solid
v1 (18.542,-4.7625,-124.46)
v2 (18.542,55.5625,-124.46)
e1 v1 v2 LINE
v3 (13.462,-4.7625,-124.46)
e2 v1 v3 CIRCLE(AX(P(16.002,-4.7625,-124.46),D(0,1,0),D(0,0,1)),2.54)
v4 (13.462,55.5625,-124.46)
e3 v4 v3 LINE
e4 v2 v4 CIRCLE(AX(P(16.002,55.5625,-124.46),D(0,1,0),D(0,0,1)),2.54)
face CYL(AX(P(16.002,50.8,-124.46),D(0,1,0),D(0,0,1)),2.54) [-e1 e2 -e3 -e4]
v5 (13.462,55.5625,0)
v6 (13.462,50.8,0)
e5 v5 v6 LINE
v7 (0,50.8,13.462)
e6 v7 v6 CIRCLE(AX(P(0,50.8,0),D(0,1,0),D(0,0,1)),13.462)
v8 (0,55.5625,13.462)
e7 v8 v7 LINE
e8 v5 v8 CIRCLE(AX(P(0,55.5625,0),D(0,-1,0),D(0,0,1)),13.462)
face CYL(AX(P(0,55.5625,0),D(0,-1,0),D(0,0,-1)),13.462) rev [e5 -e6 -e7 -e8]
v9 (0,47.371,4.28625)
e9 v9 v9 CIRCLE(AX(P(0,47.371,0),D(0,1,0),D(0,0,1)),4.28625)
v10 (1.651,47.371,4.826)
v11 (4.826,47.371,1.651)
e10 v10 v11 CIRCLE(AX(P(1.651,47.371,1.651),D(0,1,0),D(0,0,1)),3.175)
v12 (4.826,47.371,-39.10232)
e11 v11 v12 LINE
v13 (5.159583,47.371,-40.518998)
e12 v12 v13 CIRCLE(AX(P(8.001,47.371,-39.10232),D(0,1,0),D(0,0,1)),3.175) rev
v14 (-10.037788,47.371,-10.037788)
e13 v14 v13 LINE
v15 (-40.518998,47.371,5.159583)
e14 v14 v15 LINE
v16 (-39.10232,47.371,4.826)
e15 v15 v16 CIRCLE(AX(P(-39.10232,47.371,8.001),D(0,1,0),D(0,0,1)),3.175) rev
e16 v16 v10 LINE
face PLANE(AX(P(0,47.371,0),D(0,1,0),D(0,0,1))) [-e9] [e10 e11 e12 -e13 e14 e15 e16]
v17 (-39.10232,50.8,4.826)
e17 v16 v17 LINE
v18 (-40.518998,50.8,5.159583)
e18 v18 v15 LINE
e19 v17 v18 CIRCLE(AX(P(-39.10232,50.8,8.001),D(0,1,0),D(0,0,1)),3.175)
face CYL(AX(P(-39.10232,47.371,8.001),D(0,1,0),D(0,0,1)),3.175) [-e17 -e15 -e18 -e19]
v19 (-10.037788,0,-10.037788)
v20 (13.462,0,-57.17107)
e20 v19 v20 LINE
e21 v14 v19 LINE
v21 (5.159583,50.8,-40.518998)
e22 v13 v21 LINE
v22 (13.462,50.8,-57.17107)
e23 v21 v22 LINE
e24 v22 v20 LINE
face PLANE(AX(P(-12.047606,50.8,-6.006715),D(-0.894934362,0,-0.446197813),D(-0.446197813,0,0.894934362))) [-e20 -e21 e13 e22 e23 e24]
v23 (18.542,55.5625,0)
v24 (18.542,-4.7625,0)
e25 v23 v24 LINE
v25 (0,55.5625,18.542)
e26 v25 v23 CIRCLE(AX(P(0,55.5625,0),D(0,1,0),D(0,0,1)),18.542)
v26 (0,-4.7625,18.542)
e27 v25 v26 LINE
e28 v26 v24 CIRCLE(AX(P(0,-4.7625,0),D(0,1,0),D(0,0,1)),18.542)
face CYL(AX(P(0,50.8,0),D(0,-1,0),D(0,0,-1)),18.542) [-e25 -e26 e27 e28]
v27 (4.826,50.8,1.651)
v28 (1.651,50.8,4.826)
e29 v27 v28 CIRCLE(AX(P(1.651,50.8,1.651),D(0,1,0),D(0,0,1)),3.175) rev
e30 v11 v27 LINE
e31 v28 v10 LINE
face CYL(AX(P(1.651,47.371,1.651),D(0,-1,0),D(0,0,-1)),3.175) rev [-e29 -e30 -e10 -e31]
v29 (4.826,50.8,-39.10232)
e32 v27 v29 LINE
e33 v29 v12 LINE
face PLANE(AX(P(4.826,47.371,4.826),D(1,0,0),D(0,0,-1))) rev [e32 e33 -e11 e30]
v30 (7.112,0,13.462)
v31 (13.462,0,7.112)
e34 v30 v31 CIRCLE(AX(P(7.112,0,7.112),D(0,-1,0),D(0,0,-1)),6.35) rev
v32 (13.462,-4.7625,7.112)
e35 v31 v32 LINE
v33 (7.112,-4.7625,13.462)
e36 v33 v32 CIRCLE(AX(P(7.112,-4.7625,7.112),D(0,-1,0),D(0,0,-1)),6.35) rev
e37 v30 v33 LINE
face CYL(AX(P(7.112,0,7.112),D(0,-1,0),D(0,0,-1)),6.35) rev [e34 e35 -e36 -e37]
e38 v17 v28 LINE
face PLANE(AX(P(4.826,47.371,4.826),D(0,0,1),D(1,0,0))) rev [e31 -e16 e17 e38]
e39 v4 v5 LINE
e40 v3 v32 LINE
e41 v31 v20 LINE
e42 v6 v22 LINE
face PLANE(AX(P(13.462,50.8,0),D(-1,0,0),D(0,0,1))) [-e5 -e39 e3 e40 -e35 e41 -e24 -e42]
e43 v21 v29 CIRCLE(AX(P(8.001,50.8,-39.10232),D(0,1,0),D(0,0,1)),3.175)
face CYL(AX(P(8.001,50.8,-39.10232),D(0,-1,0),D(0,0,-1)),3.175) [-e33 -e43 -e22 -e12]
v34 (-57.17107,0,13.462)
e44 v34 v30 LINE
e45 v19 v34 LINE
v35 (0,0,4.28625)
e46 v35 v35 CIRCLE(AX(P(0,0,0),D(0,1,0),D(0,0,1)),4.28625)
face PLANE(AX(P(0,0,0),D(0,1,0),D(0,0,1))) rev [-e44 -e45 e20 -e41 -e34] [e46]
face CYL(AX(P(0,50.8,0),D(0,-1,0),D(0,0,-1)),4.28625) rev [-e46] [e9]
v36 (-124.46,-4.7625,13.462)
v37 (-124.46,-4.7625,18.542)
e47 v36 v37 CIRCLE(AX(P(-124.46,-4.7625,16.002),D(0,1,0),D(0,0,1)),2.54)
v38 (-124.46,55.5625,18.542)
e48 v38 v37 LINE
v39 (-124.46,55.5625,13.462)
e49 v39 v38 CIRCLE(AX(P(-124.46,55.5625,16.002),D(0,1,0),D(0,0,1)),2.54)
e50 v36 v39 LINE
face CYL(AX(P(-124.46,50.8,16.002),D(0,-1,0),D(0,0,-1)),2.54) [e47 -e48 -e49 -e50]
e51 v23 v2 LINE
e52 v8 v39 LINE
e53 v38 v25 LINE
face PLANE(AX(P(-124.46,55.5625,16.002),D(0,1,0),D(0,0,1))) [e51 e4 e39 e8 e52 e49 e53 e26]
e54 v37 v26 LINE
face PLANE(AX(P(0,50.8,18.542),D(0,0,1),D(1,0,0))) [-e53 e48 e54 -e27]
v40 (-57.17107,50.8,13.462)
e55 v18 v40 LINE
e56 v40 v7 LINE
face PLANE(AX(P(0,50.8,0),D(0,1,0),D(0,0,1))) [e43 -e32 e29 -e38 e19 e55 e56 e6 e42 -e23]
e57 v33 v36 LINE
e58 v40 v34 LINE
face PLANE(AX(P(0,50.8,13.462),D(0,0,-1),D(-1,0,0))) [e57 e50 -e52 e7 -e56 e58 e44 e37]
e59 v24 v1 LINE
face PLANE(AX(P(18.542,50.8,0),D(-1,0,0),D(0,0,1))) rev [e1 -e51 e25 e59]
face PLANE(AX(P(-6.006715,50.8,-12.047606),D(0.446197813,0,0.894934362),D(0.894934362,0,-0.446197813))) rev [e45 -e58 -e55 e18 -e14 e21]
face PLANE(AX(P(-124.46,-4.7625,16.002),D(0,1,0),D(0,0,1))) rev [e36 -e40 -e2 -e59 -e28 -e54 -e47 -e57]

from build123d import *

# Parameters (mm, degrees)
SKETCH1_R           = 4.28625
BOSS_EXTRUDE1_DEPTH = 50.8
FILLET2_R           = 2.54
SKETCH7_W           = 44.675933609
SKETCH7_H           = 44.675933609
CUT_EXTRUDE3_DEPTH  = 3.429
FILLET9_R           = 3.175
BOSS_EXTRUDE2_DEPTH = 30.1625
CUT_EXTRUDE4_START  = -4.7625
CUT_EXTRUDE4_DEPTH  = 4.7625


with BuildPart() as part:
    # Sketch1 → Boss-Extrude1 (new body)
    with BuildSketch(Plane(origin=(0, 0, 0), x_dir=(1, 0, 0), z_dir=(0, 1, 0))):
        with BuildLine():
            Line((13.462, 57.17106993), (-10.037787665, 10.037787665))
            Line((-10.037787665, 10.037787665), (-57.17106993, -13.462))
            Line((-57.17106993, -13.462), (-127, -13.462))
            Line((-127, -13.462), (-127, -18.542))
            Line((-127, -18.542), (0, -18.542))
            ThreePointArc((0, -18.542), (13.111173937, -13.111173937), (18.542, 0))
            Line((18.542, 0), (18.542, 127))
            Line((18.542, 127), (13.462, 127))
            Line((13.462, 127), (13.462, 57.17106993))
        make_face()
        with Locations(Location((0, 0, 0), (0, 0, 270))):
            Circle(SKETCH1_R, mode=Mode.SUBTRACT)
    extrude(amount=BOSS_EXTRUDE1_DEPTH)

    # Fillet2
    fillet2_edges = [part.edges().sort_by_distance(p)[0] for p in [
        (13.462, 25.4, -127),
        (18.542, 25.4, -127),
        (-127, 25.4, 13.462),
        (-127, 25.4, 18.542),
    ]]
    fillet(fillet2_edges, radius=FILLET2_R - 0.0001)  # a hair under: the kernel refuses the full size

    # Sketch7 → Cut-Extrude3 (cut)
    with BuildSketch(Plane(origin=(0, 50.8, 0), x_dir=(1, 0, 0), z_dir=(0, 1, 0))):
        with Locations((-17.511966805, 17.511966805)):
            Rectangle(SKETCH7_W, SKETCH7_H)
    extrude(amount=-CUT_EXTRUDE3_DEPTH, mode=Mode.SUBTRACT)

    # Fillet9
    fillet9_edges = [part.edges().sort_by_distance(p)[0] for p in [
        (4.826, 49.0855, -39.849933609),
        (4.826, 49.0855, 4.826),
        (-39.849933609, 49.0855, 4.826),
    ]]
    fillet(fillet9_edges, radius=FILLET9_R)

    # Sketch8 → Boss-Extrude2 (add, symmetric)
    with BuildSketch(Plane(origin=(0, 25.4, 0), x_dir=(1, 0, 0), z_dir=(0, 1, 0))):
        with BuildLine():
            Line((0, -13.462), (-124.46, -13.462))
            ThreePointArc((-124.46, -13.462), (-126.256051224, -14.205948776), (-127, -16.002))
            ThreePointArc((-127, -16.002), (-126.256051224, -17.798051224), (-124.46, -18.542))
            Line((-124.46, -18.542), (0, -18.542))
            ThreePointArc((0, -18.542), (13.111173937, -13.111173937), (18.542, 0))
            Line((18.542, 0), (18.542, 124.46))
            ThreePointArc((18.542, 124.46), (17.798051224, 126.256051224), (16.002, 127))
            ThreePointArc((16.002, 127), (14.205948776, 126.256051224), (13.462, 124.46))
            Line((13.462, 124.46), (13.462, 0))
            ThreePointArc((13.462, 0), (9.519071488, -9.519071488), (0, -13.462))
        make_face()
    extrude(amount=BOSS_EXTRUDE2_DEPTH, both=True)

    # Sketch9 → Cut-Extrude4 (cut)
    with BuildSketch(Plane.XZ.offset(4.7625).offset(CUT_EXTRUDE4_START)):
        with BuildLine():
            Line((7.112, 13.462), (0, 13.462))
            ThreePointArc((0, 13.462), (9.519071488, 9.519071488), (13.462, 0))
            Line((13.462, 0), (13.462, 7.112))
            ThreePointArc((13.462, 7.112), (11.602128061, 11.602128061), (7.112, 13.462))
        make_face()
    extrude(amount=CUT_EXTRUDE4_DEPTH, mode=Mode.SUBTRACT)


solid = part.part
